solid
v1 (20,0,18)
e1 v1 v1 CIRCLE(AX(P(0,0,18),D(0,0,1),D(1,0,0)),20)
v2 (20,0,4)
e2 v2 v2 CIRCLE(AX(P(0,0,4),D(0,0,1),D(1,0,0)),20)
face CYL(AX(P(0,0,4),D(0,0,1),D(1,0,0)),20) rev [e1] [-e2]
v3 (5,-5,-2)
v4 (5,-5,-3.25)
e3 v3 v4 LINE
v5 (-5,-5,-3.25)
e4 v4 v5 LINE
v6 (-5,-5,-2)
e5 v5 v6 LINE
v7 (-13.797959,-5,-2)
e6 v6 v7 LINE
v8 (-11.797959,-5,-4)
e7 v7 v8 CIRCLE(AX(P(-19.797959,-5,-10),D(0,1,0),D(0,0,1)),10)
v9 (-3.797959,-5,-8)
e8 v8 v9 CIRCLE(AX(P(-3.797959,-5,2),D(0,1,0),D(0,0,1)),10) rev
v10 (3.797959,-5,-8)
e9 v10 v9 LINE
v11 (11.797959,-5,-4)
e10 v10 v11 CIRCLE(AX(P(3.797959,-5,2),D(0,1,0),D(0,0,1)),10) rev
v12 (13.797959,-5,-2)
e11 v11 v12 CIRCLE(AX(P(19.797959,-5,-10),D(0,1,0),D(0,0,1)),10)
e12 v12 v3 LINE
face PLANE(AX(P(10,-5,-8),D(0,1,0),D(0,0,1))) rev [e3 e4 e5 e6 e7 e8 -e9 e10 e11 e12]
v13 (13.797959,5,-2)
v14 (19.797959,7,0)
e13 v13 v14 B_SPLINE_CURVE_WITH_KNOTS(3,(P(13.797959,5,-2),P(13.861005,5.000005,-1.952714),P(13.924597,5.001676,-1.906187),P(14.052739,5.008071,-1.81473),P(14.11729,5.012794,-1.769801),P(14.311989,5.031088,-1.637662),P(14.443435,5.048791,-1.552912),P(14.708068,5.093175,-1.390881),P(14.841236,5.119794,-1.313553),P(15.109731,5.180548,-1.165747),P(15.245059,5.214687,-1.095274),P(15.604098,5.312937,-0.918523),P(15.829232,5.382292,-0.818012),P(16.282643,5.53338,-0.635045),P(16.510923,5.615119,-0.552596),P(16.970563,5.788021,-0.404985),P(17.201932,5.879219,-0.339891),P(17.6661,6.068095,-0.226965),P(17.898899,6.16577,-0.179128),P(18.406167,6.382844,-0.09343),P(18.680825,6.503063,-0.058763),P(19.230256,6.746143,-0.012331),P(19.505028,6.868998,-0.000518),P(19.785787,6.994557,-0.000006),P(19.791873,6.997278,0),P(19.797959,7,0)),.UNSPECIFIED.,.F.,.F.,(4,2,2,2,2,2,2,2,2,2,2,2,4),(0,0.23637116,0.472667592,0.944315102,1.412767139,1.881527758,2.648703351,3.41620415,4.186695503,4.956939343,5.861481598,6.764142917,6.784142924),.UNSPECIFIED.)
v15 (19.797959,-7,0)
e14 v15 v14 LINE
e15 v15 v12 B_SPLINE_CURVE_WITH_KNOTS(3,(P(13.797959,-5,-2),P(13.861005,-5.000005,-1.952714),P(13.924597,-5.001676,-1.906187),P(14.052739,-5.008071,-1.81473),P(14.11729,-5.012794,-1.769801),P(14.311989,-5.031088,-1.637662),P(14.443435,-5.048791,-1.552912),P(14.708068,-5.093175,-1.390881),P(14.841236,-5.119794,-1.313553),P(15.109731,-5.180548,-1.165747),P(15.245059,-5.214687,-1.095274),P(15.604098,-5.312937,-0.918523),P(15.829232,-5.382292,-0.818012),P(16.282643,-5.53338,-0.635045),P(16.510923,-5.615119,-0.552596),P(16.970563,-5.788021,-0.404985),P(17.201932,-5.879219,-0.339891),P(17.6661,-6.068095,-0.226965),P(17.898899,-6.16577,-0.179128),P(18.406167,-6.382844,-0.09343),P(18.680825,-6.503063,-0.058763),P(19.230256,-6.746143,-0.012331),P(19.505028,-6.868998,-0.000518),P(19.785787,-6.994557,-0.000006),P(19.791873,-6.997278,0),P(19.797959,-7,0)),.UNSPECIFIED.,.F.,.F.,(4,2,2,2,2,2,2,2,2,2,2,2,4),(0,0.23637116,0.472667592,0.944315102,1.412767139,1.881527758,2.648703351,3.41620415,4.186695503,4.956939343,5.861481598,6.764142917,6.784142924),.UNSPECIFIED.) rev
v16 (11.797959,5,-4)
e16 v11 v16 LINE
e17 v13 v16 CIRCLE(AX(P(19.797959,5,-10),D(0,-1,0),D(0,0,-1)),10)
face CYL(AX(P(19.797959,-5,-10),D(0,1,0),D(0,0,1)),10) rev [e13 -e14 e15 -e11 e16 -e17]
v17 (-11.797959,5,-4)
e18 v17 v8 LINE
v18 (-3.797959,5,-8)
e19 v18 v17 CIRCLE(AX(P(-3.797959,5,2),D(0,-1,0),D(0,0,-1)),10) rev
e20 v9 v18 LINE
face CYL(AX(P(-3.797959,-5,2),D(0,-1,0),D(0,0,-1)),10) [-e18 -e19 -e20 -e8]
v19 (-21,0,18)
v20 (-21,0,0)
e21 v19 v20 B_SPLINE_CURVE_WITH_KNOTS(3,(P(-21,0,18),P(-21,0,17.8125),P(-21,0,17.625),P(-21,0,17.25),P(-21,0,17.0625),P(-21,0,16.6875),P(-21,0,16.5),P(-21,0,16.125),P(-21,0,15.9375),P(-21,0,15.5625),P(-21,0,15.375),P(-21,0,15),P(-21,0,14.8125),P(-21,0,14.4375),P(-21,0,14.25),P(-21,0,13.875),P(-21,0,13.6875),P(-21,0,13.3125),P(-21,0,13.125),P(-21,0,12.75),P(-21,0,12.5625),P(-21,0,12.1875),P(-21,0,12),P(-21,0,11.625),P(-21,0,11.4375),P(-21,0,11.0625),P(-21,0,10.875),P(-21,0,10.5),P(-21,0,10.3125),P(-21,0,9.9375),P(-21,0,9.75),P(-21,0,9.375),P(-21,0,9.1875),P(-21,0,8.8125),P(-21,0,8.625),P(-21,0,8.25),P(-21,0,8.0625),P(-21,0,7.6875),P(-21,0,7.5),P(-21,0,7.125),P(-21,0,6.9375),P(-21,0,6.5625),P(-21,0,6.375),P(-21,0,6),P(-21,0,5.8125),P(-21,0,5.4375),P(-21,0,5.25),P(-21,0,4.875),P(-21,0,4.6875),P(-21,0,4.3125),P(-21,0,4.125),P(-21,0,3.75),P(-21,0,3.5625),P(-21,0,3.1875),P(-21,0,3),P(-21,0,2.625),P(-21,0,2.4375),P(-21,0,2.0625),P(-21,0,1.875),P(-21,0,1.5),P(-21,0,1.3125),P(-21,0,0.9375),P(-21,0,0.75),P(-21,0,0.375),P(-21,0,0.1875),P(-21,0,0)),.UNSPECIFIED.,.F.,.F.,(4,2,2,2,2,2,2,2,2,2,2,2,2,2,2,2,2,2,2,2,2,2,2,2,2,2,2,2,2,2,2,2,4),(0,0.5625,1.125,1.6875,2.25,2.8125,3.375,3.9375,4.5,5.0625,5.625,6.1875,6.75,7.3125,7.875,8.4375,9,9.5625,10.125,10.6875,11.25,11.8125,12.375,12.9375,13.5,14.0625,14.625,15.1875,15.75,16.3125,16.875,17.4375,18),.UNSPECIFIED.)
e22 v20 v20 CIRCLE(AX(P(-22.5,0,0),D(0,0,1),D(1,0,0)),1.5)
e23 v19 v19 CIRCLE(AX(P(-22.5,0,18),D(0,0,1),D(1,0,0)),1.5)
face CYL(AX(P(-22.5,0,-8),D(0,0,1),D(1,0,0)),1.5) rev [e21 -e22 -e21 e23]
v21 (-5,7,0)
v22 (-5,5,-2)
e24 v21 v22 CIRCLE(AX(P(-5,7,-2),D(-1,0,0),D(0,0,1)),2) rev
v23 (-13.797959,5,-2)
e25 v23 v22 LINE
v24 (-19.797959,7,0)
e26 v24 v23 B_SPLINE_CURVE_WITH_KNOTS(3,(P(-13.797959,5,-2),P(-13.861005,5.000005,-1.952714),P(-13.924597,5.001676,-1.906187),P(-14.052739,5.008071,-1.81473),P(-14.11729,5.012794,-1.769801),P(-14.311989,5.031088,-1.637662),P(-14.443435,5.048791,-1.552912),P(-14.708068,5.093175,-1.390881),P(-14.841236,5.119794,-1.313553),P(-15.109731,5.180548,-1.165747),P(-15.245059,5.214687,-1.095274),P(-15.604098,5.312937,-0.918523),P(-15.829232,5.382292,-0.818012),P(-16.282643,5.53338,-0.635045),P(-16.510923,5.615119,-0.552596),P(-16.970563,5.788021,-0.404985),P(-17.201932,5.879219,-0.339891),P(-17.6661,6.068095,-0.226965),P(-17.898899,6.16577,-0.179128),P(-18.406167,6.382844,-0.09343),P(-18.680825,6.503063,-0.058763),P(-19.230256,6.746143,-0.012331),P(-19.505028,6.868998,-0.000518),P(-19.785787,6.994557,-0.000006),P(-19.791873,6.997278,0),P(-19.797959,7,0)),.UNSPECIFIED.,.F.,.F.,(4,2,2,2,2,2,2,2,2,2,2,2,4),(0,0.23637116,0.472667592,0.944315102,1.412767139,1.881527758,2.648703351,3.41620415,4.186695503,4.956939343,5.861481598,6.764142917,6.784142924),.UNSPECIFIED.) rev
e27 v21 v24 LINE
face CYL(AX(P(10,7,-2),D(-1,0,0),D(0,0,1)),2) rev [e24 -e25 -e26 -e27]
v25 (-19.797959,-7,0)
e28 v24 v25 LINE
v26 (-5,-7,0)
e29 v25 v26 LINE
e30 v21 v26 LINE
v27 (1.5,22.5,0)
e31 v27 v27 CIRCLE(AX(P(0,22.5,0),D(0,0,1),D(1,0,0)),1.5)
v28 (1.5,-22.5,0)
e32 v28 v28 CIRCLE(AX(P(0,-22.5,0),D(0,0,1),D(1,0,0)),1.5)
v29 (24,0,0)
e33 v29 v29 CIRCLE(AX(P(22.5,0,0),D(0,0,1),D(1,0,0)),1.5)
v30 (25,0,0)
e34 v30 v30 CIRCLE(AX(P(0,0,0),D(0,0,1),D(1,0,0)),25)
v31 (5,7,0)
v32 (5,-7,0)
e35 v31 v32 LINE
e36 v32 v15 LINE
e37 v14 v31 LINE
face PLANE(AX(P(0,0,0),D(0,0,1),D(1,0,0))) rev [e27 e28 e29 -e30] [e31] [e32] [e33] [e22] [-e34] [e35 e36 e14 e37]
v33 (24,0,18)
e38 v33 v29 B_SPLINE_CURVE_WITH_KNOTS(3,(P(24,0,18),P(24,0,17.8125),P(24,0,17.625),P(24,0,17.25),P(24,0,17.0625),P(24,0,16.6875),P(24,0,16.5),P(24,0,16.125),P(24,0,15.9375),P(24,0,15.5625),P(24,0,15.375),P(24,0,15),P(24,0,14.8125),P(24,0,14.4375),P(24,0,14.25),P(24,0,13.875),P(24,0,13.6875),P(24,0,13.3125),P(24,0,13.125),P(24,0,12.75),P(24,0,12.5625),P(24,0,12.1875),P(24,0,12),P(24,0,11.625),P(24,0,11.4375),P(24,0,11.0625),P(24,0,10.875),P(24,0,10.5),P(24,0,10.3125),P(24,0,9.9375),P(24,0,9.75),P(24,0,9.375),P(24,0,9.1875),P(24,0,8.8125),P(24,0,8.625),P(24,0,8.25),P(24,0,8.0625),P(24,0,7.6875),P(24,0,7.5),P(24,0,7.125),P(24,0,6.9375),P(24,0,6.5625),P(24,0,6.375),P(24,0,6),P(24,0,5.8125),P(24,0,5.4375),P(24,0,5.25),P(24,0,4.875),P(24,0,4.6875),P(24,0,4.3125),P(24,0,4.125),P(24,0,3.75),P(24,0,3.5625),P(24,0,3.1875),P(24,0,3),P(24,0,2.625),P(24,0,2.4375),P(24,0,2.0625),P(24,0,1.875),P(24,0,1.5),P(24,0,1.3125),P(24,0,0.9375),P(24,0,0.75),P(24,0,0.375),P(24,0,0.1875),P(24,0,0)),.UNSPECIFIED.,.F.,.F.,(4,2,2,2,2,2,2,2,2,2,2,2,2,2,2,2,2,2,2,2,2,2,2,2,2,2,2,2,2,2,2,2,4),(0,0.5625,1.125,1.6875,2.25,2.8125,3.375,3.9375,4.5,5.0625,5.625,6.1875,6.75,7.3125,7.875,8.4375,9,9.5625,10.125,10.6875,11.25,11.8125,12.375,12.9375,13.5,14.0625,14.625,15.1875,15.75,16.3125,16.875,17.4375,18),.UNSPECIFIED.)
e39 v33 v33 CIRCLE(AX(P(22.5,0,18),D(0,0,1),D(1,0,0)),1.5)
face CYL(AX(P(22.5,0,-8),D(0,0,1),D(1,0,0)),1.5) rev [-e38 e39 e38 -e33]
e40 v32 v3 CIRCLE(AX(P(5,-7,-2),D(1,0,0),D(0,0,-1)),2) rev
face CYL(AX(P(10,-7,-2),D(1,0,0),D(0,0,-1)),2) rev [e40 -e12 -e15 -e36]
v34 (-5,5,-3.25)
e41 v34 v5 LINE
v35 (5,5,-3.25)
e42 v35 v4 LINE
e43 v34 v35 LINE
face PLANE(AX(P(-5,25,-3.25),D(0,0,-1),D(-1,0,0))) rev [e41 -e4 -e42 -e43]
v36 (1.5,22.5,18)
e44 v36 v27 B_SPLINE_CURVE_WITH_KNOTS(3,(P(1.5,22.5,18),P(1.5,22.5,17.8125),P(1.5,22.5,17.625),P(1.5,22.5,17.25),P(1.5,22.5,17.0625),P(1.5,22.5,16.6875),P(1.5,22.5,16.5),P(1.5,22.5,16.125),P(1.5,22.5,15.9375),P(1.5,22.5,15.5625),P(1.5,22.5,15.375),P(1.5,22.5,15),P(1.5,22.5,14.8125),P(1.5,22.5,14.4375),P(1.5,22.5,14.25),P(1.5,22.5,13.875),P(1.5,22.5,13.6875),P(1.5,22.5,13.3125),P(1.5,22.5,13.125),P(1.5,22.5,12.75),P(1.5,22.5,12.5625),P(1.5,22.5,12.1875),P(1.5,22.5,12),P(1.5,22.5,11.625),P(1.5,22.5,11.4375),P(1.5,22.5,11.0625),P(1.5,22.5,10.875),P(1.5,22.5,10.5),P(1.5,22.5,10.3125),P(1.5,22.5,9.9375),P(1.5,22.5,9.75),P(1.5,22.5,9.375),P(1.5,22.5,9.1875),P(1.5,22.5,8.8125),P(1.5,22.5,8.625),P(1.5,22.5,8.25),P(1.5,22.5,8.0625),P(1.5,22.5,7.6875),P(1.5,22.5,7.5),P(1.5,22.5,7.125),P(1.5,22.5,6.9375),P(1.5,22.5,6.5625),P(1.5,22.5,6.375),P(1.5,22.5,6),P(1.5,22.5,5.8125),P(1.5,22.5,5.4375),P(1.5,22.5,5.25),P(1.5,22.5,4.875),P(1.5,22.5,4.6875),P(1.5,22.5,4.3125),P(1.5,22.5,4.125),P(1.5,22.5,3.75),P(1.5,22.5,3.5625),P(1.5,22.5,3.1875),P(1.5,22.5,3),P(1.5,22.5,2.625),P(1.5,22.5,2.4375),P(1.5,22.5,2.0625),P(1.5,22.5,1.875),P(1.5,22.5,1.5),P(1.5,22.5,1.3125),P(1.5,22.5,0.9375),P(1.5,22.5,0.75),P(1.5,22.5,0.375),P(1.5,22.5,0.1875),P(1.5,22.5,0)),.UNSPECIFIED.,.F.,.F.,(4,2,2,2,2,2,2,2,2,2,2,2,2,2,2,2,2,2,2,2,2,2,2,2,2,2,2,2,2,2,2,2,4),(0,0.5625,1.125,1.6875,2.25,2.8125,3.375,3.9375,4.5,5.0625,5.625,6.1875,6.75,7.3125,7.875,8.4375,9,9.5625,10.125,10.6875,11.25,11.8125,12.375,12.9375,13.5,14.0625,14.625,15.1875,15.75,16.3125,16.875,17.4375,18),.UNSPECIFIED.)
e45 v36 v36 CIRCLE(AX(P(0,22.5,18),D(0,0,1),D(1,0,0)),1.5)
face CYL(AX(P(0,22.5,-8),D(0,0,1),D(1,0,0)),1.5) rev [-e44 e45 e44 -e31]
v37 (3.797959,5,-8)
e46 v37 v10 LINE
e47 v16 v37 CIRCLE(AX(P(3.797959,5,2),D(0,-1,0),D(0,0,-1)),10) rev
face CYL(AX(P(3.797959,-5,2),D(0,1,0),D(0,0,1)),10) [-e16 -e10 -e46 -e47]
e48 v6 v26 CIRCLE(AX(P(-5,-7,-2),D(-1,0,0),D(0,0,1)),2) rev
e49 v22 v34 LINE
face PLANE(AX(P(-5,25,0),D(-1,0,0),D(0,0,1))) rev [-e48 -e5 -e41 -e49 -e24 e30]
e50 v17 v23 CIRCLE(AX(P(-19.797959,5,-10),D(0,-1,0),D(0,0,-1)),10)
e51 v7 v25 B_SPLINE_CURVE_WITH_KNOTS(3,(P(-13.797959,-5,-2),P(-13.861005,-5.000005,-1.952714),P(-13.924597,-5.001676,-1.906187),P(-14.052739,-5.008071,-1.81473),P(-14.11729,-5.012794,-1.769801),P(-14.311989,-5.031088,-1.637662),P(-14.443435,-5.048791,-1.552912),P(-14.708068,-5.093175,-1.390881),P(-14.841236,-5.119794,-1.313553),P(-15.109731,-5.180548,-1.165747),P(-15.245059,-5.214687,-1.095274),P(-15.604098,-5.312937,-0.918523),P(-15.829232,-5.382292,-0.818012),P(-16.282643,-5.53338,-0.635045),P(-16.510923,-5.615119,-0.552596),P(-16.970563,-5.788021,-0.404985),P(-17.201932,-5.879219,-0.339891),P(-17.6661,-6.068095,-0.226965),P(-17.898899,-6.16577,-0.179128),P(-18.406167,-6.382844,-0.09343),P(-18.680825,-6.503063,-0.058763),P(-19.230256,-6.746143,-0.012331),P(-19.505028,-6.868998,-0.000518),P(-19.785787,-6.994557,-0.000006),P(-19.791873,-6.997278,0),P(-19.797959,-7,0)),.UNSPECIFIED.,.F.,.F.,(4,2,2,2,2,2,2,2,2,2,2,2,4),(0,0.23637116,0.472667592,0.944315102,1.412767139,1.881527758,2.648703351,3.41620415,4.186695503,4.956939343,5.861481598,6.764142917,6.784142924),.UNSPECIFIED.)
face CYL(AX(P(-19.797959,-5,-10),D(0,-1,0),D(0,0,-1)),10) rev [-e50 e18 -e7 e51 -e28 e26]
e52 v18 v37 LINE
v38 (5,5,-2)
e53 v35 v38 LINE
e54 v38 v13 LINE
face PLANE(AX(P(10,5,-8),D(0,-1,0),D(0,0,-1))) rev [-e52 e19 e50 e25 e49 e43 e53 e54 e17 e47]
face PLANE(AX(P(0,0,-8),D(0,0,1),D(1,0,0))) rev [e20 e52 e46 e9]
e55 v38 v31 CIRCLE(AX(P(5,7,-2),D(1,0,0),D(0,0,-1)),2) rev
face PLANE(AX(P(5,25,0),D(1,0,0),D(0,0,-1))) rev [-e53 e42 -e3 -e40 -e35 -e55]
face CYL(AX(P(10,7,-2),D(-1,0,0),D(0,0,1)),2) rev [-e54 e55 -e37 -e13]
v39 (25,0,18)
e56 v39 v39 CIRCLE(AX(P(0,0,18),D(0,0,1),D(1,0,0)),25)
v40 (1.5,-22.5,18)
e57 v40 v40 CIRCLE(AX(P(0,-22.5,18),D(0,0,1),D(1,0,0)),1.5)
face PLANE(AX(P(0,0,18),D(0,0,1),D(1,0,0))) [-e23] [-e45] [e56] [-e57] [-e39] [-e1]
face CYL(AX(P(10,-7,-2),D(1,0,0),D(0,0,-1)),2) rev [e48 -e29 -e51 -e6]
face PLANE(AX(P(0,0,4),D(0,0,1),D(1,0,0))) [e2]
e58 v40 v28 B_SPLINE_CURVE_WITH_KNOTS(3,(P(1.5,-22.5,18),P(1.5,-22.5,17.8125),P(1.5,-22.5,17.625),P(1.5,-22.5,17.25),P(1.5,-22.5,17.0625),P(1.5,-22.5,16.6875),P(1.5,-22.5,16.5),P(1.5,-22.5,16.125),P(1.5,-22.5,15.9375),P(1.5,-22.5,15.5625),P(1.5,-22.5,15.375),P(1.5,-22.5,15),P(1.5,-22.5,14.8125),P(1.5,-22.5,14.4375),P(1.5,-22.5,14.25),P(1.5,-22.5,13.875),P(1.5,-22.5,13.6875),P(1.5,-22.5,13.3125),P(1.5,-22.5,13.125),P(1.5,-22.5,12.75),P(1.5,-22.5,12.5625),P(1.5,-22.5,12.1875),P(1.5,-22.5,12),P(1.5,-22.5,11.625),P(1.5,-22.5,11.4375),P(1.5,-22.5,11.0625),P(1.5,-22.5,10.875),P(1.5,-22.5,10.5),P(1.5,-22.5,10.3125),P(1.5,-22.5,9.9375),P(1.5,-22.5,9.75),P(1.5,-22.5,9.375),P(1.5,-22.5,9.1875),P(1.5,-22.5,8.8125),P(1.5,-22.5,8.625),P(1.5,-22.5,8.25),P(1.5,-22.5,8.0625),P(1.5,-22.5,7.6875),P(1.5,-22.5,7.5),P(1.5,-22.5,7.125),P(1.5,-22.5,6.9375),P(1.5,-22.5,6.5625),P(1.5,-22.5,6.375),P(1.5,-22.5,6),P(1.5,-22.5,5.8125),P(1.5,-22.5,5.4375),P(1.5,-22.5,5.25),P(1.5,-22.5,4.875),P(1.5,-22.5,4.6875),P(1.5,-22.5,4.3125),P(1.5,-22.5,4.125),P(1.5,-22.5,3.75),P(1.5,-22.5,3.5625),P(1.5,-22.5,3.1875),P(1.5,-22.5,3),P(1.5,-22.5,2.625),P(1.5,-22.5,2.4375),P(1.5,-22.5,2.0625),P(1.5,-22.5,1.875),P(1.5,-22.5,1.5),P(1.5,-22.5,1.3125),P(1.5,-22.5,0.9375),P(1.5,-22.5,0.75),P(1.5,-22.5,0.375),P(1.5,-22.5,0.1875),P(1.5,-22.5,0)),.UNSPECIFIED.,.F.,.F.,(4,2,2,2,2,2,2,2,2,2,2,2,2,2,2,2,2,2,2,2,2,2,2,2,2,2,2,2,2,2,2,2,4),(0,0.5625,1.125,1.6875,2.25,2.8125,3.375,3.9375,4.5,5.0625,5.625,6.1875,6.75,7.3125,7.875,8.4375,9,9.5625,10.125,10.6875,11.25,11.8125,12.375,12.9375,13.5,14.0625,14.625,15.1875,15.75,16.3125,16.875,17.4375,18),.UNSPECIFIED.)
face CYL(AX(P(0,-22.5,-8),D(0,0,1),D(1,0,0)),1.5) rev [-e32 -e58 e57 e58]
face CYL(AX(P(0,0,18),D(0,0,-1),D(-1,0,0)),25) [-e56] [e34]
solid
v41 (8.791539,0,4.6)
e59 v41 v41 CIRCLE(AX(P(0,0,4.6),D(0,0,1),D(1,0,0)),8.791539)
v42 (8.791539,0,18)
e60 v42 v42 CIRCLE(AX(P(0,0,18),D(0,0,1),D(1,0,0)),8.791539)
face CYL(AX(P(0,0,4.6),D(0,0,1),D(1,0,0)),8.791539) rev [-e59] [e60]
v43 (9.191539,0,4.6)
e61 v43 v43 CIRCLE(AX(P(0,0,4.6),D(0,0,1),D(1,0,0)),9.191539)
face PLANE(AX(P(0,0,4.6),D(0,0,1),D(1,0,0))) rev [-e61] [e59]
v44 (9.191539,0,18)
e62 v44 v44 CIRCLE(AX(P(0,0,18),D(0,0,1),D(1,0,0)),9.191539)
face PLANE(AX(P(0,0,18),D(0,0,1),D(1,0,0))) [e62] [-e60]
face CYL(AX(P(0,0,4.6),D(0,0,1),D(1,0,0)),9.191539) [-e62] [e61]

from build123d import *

# Parameters (mm, degrees)
SKETCH1_R               = 25
BOSS_EXTRUDE1_DEPTH     = 18
SKETCH2_R               = 20
CUT_EXTRUDE1_DEPTH      = 14
SKETCH3_W               = 20
SKETCH3_H               = 10
BOSS_EXTRUDE2_DEPTH     = 8
FILLET2_R               = 10
FILLET3_R               = 10
FILLET4_R               = 2
CUT_EXTRUDE2_DEPTH      = 44
CUT_EXTRUDE2_DEPTH_BACK = 44
SKETCH4_W               = 10
SKETCH4_H               = 3.25
CUT_EXTRUDE3_DEPTH      = 44.886216515
CUT_EXTRUDE3_DEPTH_BACK = 44.886216515
SKETCH5_R               = 1.5
SKETCH6_R               = 9.191539394
SKETCH6_R_2             = 8.791539394
BOSS_EXTRUDE3_DEPTH     = 13.4


with BuildPart() as part:
    # Sketch1 → Boss-Extrude1 (new body)
    with BuildSketch(Plane.XY):
        Circle(SKETCH1_R)
    extrude(amount=BOSS_EXTRUDE1_DEPTH)

    # Sketch2 → Cut-Extrude1 (cut)
    with BuildSketch(Plane.XY.offset(18)):
        Circle(SKETCH2_R)
    extrude(amount=-CUT_EXTRUDE1_DEPTH, mode=Mode.SUBTRACT)

    # Sketch3 → Boss-Extrude2 (add)
    with BuildSketch(Plane(origin=(0, 0, 0), x_dir=(-1, 0, 0), z_dir=(0, 0, -1))):
        Rectangle(SKETCH3_W, SKETCH3_H)
    extrude(amount=BOSS_EXTRUDE2_DEPTH)

    # Fillet2
    # the kernel refuses this fillet: 10 mm, written as the material it adds along each edge
    with BuildSketch(Plane(origin=(-10, -5, 0), x_dir=(-1, 0, 0), z_dir=(0, 1, 0)), Plane(origin=(10, 5, 0), x_dir=(1, 0, 0), z_dir=(0, -1, 0))) as fillet2_piece_1:
        with BuildLine():
            CenterArc((9.797958971, -10), FILLET2_R, 90, 78.463040967)
            Line((0, -8), (-0.195959179, -7.96))
            ThreePointArc((-0.195959179, -7.96), (-0.2, -4), (-0.2, 0))
            Line((-0.2, 0), (0, 0.2))
            Line((0, 0.2), (9.797958971, 0.2))
            Line((9.797958971, 0.2), (9.797958971, 0))
        make_face()
    extrude(amount=10)

    # Fillet3
    fillet3_edges = [part.edges().sort_by_distance(p)[0] for p in [
        (-10, 0, -8),
        (10, 0, -8),
    ]]
    fillet(fillet3_edges, radius=FILLET3_R)

    # Fillet4
    fillet4_edges = [part.edges().sort_by_distance(p)[0] for p in [
        (0, 5, 0),
        (0, -5, 0),
    ]]
    fillet(fillet4_edges, radius=FILLET4_R)

    # Sketch4 → Cut-Extrude2 (cut, two sides: drawn at the far end of the back side and taken through both)
    with BuildSketch(Plane.XZ.offset(5).offset(-CUT_EXTRUDE2_DEPTH_BACK)):
        with Locations((0, -1.625)):
            Rectangle(SKETCH4_W, SKETCH4_H)
    extrude(amount=CUT_EXTRUDE2_DEPTH + CUT_EXTRUDE2_DEPTH_BACK, mode=Mode.SUBTRACT)

    # Sketch5 → Cut-Extrude3 (cut, two sides: drawn at the far end of the back side and taken through both)
    with BuildSketch(Plane.XY.offset(18).offset(-CUT_EXTRUDE3_DEPTH_BACK)):
        with Locations((0, 22.5)):
            Circle(SKETCH5_R)
        with Locations((22.5, 0)):
            Circle(SKETCH5_R)
        with Locations((0, -22.5)):
            Circle(SKETCH5_R)
        with Locations((-22.5, 0)):
            Circle(SKETCH5_R)
    extrude(amount=CUT_EXTRUDE3_DEPTH + CUT_EXTRUDE3_DEPTH_BACK, mode=Mode.SUBTRACT)


with BuildPart() as body_2:
    # Sketch6 → Boss-Extrude3 (new body)
    with BuildSketch(Plane.XY.offset(18)):
        Circle(SKETCH6_R)
        Circle(SKETCH6_R_2, mode=Mode.SUBTRACT)
    extrude(amount=-BOSS_EXTRUDE3_DEPTH)


solid = Compound([part.part, body_2.part])
